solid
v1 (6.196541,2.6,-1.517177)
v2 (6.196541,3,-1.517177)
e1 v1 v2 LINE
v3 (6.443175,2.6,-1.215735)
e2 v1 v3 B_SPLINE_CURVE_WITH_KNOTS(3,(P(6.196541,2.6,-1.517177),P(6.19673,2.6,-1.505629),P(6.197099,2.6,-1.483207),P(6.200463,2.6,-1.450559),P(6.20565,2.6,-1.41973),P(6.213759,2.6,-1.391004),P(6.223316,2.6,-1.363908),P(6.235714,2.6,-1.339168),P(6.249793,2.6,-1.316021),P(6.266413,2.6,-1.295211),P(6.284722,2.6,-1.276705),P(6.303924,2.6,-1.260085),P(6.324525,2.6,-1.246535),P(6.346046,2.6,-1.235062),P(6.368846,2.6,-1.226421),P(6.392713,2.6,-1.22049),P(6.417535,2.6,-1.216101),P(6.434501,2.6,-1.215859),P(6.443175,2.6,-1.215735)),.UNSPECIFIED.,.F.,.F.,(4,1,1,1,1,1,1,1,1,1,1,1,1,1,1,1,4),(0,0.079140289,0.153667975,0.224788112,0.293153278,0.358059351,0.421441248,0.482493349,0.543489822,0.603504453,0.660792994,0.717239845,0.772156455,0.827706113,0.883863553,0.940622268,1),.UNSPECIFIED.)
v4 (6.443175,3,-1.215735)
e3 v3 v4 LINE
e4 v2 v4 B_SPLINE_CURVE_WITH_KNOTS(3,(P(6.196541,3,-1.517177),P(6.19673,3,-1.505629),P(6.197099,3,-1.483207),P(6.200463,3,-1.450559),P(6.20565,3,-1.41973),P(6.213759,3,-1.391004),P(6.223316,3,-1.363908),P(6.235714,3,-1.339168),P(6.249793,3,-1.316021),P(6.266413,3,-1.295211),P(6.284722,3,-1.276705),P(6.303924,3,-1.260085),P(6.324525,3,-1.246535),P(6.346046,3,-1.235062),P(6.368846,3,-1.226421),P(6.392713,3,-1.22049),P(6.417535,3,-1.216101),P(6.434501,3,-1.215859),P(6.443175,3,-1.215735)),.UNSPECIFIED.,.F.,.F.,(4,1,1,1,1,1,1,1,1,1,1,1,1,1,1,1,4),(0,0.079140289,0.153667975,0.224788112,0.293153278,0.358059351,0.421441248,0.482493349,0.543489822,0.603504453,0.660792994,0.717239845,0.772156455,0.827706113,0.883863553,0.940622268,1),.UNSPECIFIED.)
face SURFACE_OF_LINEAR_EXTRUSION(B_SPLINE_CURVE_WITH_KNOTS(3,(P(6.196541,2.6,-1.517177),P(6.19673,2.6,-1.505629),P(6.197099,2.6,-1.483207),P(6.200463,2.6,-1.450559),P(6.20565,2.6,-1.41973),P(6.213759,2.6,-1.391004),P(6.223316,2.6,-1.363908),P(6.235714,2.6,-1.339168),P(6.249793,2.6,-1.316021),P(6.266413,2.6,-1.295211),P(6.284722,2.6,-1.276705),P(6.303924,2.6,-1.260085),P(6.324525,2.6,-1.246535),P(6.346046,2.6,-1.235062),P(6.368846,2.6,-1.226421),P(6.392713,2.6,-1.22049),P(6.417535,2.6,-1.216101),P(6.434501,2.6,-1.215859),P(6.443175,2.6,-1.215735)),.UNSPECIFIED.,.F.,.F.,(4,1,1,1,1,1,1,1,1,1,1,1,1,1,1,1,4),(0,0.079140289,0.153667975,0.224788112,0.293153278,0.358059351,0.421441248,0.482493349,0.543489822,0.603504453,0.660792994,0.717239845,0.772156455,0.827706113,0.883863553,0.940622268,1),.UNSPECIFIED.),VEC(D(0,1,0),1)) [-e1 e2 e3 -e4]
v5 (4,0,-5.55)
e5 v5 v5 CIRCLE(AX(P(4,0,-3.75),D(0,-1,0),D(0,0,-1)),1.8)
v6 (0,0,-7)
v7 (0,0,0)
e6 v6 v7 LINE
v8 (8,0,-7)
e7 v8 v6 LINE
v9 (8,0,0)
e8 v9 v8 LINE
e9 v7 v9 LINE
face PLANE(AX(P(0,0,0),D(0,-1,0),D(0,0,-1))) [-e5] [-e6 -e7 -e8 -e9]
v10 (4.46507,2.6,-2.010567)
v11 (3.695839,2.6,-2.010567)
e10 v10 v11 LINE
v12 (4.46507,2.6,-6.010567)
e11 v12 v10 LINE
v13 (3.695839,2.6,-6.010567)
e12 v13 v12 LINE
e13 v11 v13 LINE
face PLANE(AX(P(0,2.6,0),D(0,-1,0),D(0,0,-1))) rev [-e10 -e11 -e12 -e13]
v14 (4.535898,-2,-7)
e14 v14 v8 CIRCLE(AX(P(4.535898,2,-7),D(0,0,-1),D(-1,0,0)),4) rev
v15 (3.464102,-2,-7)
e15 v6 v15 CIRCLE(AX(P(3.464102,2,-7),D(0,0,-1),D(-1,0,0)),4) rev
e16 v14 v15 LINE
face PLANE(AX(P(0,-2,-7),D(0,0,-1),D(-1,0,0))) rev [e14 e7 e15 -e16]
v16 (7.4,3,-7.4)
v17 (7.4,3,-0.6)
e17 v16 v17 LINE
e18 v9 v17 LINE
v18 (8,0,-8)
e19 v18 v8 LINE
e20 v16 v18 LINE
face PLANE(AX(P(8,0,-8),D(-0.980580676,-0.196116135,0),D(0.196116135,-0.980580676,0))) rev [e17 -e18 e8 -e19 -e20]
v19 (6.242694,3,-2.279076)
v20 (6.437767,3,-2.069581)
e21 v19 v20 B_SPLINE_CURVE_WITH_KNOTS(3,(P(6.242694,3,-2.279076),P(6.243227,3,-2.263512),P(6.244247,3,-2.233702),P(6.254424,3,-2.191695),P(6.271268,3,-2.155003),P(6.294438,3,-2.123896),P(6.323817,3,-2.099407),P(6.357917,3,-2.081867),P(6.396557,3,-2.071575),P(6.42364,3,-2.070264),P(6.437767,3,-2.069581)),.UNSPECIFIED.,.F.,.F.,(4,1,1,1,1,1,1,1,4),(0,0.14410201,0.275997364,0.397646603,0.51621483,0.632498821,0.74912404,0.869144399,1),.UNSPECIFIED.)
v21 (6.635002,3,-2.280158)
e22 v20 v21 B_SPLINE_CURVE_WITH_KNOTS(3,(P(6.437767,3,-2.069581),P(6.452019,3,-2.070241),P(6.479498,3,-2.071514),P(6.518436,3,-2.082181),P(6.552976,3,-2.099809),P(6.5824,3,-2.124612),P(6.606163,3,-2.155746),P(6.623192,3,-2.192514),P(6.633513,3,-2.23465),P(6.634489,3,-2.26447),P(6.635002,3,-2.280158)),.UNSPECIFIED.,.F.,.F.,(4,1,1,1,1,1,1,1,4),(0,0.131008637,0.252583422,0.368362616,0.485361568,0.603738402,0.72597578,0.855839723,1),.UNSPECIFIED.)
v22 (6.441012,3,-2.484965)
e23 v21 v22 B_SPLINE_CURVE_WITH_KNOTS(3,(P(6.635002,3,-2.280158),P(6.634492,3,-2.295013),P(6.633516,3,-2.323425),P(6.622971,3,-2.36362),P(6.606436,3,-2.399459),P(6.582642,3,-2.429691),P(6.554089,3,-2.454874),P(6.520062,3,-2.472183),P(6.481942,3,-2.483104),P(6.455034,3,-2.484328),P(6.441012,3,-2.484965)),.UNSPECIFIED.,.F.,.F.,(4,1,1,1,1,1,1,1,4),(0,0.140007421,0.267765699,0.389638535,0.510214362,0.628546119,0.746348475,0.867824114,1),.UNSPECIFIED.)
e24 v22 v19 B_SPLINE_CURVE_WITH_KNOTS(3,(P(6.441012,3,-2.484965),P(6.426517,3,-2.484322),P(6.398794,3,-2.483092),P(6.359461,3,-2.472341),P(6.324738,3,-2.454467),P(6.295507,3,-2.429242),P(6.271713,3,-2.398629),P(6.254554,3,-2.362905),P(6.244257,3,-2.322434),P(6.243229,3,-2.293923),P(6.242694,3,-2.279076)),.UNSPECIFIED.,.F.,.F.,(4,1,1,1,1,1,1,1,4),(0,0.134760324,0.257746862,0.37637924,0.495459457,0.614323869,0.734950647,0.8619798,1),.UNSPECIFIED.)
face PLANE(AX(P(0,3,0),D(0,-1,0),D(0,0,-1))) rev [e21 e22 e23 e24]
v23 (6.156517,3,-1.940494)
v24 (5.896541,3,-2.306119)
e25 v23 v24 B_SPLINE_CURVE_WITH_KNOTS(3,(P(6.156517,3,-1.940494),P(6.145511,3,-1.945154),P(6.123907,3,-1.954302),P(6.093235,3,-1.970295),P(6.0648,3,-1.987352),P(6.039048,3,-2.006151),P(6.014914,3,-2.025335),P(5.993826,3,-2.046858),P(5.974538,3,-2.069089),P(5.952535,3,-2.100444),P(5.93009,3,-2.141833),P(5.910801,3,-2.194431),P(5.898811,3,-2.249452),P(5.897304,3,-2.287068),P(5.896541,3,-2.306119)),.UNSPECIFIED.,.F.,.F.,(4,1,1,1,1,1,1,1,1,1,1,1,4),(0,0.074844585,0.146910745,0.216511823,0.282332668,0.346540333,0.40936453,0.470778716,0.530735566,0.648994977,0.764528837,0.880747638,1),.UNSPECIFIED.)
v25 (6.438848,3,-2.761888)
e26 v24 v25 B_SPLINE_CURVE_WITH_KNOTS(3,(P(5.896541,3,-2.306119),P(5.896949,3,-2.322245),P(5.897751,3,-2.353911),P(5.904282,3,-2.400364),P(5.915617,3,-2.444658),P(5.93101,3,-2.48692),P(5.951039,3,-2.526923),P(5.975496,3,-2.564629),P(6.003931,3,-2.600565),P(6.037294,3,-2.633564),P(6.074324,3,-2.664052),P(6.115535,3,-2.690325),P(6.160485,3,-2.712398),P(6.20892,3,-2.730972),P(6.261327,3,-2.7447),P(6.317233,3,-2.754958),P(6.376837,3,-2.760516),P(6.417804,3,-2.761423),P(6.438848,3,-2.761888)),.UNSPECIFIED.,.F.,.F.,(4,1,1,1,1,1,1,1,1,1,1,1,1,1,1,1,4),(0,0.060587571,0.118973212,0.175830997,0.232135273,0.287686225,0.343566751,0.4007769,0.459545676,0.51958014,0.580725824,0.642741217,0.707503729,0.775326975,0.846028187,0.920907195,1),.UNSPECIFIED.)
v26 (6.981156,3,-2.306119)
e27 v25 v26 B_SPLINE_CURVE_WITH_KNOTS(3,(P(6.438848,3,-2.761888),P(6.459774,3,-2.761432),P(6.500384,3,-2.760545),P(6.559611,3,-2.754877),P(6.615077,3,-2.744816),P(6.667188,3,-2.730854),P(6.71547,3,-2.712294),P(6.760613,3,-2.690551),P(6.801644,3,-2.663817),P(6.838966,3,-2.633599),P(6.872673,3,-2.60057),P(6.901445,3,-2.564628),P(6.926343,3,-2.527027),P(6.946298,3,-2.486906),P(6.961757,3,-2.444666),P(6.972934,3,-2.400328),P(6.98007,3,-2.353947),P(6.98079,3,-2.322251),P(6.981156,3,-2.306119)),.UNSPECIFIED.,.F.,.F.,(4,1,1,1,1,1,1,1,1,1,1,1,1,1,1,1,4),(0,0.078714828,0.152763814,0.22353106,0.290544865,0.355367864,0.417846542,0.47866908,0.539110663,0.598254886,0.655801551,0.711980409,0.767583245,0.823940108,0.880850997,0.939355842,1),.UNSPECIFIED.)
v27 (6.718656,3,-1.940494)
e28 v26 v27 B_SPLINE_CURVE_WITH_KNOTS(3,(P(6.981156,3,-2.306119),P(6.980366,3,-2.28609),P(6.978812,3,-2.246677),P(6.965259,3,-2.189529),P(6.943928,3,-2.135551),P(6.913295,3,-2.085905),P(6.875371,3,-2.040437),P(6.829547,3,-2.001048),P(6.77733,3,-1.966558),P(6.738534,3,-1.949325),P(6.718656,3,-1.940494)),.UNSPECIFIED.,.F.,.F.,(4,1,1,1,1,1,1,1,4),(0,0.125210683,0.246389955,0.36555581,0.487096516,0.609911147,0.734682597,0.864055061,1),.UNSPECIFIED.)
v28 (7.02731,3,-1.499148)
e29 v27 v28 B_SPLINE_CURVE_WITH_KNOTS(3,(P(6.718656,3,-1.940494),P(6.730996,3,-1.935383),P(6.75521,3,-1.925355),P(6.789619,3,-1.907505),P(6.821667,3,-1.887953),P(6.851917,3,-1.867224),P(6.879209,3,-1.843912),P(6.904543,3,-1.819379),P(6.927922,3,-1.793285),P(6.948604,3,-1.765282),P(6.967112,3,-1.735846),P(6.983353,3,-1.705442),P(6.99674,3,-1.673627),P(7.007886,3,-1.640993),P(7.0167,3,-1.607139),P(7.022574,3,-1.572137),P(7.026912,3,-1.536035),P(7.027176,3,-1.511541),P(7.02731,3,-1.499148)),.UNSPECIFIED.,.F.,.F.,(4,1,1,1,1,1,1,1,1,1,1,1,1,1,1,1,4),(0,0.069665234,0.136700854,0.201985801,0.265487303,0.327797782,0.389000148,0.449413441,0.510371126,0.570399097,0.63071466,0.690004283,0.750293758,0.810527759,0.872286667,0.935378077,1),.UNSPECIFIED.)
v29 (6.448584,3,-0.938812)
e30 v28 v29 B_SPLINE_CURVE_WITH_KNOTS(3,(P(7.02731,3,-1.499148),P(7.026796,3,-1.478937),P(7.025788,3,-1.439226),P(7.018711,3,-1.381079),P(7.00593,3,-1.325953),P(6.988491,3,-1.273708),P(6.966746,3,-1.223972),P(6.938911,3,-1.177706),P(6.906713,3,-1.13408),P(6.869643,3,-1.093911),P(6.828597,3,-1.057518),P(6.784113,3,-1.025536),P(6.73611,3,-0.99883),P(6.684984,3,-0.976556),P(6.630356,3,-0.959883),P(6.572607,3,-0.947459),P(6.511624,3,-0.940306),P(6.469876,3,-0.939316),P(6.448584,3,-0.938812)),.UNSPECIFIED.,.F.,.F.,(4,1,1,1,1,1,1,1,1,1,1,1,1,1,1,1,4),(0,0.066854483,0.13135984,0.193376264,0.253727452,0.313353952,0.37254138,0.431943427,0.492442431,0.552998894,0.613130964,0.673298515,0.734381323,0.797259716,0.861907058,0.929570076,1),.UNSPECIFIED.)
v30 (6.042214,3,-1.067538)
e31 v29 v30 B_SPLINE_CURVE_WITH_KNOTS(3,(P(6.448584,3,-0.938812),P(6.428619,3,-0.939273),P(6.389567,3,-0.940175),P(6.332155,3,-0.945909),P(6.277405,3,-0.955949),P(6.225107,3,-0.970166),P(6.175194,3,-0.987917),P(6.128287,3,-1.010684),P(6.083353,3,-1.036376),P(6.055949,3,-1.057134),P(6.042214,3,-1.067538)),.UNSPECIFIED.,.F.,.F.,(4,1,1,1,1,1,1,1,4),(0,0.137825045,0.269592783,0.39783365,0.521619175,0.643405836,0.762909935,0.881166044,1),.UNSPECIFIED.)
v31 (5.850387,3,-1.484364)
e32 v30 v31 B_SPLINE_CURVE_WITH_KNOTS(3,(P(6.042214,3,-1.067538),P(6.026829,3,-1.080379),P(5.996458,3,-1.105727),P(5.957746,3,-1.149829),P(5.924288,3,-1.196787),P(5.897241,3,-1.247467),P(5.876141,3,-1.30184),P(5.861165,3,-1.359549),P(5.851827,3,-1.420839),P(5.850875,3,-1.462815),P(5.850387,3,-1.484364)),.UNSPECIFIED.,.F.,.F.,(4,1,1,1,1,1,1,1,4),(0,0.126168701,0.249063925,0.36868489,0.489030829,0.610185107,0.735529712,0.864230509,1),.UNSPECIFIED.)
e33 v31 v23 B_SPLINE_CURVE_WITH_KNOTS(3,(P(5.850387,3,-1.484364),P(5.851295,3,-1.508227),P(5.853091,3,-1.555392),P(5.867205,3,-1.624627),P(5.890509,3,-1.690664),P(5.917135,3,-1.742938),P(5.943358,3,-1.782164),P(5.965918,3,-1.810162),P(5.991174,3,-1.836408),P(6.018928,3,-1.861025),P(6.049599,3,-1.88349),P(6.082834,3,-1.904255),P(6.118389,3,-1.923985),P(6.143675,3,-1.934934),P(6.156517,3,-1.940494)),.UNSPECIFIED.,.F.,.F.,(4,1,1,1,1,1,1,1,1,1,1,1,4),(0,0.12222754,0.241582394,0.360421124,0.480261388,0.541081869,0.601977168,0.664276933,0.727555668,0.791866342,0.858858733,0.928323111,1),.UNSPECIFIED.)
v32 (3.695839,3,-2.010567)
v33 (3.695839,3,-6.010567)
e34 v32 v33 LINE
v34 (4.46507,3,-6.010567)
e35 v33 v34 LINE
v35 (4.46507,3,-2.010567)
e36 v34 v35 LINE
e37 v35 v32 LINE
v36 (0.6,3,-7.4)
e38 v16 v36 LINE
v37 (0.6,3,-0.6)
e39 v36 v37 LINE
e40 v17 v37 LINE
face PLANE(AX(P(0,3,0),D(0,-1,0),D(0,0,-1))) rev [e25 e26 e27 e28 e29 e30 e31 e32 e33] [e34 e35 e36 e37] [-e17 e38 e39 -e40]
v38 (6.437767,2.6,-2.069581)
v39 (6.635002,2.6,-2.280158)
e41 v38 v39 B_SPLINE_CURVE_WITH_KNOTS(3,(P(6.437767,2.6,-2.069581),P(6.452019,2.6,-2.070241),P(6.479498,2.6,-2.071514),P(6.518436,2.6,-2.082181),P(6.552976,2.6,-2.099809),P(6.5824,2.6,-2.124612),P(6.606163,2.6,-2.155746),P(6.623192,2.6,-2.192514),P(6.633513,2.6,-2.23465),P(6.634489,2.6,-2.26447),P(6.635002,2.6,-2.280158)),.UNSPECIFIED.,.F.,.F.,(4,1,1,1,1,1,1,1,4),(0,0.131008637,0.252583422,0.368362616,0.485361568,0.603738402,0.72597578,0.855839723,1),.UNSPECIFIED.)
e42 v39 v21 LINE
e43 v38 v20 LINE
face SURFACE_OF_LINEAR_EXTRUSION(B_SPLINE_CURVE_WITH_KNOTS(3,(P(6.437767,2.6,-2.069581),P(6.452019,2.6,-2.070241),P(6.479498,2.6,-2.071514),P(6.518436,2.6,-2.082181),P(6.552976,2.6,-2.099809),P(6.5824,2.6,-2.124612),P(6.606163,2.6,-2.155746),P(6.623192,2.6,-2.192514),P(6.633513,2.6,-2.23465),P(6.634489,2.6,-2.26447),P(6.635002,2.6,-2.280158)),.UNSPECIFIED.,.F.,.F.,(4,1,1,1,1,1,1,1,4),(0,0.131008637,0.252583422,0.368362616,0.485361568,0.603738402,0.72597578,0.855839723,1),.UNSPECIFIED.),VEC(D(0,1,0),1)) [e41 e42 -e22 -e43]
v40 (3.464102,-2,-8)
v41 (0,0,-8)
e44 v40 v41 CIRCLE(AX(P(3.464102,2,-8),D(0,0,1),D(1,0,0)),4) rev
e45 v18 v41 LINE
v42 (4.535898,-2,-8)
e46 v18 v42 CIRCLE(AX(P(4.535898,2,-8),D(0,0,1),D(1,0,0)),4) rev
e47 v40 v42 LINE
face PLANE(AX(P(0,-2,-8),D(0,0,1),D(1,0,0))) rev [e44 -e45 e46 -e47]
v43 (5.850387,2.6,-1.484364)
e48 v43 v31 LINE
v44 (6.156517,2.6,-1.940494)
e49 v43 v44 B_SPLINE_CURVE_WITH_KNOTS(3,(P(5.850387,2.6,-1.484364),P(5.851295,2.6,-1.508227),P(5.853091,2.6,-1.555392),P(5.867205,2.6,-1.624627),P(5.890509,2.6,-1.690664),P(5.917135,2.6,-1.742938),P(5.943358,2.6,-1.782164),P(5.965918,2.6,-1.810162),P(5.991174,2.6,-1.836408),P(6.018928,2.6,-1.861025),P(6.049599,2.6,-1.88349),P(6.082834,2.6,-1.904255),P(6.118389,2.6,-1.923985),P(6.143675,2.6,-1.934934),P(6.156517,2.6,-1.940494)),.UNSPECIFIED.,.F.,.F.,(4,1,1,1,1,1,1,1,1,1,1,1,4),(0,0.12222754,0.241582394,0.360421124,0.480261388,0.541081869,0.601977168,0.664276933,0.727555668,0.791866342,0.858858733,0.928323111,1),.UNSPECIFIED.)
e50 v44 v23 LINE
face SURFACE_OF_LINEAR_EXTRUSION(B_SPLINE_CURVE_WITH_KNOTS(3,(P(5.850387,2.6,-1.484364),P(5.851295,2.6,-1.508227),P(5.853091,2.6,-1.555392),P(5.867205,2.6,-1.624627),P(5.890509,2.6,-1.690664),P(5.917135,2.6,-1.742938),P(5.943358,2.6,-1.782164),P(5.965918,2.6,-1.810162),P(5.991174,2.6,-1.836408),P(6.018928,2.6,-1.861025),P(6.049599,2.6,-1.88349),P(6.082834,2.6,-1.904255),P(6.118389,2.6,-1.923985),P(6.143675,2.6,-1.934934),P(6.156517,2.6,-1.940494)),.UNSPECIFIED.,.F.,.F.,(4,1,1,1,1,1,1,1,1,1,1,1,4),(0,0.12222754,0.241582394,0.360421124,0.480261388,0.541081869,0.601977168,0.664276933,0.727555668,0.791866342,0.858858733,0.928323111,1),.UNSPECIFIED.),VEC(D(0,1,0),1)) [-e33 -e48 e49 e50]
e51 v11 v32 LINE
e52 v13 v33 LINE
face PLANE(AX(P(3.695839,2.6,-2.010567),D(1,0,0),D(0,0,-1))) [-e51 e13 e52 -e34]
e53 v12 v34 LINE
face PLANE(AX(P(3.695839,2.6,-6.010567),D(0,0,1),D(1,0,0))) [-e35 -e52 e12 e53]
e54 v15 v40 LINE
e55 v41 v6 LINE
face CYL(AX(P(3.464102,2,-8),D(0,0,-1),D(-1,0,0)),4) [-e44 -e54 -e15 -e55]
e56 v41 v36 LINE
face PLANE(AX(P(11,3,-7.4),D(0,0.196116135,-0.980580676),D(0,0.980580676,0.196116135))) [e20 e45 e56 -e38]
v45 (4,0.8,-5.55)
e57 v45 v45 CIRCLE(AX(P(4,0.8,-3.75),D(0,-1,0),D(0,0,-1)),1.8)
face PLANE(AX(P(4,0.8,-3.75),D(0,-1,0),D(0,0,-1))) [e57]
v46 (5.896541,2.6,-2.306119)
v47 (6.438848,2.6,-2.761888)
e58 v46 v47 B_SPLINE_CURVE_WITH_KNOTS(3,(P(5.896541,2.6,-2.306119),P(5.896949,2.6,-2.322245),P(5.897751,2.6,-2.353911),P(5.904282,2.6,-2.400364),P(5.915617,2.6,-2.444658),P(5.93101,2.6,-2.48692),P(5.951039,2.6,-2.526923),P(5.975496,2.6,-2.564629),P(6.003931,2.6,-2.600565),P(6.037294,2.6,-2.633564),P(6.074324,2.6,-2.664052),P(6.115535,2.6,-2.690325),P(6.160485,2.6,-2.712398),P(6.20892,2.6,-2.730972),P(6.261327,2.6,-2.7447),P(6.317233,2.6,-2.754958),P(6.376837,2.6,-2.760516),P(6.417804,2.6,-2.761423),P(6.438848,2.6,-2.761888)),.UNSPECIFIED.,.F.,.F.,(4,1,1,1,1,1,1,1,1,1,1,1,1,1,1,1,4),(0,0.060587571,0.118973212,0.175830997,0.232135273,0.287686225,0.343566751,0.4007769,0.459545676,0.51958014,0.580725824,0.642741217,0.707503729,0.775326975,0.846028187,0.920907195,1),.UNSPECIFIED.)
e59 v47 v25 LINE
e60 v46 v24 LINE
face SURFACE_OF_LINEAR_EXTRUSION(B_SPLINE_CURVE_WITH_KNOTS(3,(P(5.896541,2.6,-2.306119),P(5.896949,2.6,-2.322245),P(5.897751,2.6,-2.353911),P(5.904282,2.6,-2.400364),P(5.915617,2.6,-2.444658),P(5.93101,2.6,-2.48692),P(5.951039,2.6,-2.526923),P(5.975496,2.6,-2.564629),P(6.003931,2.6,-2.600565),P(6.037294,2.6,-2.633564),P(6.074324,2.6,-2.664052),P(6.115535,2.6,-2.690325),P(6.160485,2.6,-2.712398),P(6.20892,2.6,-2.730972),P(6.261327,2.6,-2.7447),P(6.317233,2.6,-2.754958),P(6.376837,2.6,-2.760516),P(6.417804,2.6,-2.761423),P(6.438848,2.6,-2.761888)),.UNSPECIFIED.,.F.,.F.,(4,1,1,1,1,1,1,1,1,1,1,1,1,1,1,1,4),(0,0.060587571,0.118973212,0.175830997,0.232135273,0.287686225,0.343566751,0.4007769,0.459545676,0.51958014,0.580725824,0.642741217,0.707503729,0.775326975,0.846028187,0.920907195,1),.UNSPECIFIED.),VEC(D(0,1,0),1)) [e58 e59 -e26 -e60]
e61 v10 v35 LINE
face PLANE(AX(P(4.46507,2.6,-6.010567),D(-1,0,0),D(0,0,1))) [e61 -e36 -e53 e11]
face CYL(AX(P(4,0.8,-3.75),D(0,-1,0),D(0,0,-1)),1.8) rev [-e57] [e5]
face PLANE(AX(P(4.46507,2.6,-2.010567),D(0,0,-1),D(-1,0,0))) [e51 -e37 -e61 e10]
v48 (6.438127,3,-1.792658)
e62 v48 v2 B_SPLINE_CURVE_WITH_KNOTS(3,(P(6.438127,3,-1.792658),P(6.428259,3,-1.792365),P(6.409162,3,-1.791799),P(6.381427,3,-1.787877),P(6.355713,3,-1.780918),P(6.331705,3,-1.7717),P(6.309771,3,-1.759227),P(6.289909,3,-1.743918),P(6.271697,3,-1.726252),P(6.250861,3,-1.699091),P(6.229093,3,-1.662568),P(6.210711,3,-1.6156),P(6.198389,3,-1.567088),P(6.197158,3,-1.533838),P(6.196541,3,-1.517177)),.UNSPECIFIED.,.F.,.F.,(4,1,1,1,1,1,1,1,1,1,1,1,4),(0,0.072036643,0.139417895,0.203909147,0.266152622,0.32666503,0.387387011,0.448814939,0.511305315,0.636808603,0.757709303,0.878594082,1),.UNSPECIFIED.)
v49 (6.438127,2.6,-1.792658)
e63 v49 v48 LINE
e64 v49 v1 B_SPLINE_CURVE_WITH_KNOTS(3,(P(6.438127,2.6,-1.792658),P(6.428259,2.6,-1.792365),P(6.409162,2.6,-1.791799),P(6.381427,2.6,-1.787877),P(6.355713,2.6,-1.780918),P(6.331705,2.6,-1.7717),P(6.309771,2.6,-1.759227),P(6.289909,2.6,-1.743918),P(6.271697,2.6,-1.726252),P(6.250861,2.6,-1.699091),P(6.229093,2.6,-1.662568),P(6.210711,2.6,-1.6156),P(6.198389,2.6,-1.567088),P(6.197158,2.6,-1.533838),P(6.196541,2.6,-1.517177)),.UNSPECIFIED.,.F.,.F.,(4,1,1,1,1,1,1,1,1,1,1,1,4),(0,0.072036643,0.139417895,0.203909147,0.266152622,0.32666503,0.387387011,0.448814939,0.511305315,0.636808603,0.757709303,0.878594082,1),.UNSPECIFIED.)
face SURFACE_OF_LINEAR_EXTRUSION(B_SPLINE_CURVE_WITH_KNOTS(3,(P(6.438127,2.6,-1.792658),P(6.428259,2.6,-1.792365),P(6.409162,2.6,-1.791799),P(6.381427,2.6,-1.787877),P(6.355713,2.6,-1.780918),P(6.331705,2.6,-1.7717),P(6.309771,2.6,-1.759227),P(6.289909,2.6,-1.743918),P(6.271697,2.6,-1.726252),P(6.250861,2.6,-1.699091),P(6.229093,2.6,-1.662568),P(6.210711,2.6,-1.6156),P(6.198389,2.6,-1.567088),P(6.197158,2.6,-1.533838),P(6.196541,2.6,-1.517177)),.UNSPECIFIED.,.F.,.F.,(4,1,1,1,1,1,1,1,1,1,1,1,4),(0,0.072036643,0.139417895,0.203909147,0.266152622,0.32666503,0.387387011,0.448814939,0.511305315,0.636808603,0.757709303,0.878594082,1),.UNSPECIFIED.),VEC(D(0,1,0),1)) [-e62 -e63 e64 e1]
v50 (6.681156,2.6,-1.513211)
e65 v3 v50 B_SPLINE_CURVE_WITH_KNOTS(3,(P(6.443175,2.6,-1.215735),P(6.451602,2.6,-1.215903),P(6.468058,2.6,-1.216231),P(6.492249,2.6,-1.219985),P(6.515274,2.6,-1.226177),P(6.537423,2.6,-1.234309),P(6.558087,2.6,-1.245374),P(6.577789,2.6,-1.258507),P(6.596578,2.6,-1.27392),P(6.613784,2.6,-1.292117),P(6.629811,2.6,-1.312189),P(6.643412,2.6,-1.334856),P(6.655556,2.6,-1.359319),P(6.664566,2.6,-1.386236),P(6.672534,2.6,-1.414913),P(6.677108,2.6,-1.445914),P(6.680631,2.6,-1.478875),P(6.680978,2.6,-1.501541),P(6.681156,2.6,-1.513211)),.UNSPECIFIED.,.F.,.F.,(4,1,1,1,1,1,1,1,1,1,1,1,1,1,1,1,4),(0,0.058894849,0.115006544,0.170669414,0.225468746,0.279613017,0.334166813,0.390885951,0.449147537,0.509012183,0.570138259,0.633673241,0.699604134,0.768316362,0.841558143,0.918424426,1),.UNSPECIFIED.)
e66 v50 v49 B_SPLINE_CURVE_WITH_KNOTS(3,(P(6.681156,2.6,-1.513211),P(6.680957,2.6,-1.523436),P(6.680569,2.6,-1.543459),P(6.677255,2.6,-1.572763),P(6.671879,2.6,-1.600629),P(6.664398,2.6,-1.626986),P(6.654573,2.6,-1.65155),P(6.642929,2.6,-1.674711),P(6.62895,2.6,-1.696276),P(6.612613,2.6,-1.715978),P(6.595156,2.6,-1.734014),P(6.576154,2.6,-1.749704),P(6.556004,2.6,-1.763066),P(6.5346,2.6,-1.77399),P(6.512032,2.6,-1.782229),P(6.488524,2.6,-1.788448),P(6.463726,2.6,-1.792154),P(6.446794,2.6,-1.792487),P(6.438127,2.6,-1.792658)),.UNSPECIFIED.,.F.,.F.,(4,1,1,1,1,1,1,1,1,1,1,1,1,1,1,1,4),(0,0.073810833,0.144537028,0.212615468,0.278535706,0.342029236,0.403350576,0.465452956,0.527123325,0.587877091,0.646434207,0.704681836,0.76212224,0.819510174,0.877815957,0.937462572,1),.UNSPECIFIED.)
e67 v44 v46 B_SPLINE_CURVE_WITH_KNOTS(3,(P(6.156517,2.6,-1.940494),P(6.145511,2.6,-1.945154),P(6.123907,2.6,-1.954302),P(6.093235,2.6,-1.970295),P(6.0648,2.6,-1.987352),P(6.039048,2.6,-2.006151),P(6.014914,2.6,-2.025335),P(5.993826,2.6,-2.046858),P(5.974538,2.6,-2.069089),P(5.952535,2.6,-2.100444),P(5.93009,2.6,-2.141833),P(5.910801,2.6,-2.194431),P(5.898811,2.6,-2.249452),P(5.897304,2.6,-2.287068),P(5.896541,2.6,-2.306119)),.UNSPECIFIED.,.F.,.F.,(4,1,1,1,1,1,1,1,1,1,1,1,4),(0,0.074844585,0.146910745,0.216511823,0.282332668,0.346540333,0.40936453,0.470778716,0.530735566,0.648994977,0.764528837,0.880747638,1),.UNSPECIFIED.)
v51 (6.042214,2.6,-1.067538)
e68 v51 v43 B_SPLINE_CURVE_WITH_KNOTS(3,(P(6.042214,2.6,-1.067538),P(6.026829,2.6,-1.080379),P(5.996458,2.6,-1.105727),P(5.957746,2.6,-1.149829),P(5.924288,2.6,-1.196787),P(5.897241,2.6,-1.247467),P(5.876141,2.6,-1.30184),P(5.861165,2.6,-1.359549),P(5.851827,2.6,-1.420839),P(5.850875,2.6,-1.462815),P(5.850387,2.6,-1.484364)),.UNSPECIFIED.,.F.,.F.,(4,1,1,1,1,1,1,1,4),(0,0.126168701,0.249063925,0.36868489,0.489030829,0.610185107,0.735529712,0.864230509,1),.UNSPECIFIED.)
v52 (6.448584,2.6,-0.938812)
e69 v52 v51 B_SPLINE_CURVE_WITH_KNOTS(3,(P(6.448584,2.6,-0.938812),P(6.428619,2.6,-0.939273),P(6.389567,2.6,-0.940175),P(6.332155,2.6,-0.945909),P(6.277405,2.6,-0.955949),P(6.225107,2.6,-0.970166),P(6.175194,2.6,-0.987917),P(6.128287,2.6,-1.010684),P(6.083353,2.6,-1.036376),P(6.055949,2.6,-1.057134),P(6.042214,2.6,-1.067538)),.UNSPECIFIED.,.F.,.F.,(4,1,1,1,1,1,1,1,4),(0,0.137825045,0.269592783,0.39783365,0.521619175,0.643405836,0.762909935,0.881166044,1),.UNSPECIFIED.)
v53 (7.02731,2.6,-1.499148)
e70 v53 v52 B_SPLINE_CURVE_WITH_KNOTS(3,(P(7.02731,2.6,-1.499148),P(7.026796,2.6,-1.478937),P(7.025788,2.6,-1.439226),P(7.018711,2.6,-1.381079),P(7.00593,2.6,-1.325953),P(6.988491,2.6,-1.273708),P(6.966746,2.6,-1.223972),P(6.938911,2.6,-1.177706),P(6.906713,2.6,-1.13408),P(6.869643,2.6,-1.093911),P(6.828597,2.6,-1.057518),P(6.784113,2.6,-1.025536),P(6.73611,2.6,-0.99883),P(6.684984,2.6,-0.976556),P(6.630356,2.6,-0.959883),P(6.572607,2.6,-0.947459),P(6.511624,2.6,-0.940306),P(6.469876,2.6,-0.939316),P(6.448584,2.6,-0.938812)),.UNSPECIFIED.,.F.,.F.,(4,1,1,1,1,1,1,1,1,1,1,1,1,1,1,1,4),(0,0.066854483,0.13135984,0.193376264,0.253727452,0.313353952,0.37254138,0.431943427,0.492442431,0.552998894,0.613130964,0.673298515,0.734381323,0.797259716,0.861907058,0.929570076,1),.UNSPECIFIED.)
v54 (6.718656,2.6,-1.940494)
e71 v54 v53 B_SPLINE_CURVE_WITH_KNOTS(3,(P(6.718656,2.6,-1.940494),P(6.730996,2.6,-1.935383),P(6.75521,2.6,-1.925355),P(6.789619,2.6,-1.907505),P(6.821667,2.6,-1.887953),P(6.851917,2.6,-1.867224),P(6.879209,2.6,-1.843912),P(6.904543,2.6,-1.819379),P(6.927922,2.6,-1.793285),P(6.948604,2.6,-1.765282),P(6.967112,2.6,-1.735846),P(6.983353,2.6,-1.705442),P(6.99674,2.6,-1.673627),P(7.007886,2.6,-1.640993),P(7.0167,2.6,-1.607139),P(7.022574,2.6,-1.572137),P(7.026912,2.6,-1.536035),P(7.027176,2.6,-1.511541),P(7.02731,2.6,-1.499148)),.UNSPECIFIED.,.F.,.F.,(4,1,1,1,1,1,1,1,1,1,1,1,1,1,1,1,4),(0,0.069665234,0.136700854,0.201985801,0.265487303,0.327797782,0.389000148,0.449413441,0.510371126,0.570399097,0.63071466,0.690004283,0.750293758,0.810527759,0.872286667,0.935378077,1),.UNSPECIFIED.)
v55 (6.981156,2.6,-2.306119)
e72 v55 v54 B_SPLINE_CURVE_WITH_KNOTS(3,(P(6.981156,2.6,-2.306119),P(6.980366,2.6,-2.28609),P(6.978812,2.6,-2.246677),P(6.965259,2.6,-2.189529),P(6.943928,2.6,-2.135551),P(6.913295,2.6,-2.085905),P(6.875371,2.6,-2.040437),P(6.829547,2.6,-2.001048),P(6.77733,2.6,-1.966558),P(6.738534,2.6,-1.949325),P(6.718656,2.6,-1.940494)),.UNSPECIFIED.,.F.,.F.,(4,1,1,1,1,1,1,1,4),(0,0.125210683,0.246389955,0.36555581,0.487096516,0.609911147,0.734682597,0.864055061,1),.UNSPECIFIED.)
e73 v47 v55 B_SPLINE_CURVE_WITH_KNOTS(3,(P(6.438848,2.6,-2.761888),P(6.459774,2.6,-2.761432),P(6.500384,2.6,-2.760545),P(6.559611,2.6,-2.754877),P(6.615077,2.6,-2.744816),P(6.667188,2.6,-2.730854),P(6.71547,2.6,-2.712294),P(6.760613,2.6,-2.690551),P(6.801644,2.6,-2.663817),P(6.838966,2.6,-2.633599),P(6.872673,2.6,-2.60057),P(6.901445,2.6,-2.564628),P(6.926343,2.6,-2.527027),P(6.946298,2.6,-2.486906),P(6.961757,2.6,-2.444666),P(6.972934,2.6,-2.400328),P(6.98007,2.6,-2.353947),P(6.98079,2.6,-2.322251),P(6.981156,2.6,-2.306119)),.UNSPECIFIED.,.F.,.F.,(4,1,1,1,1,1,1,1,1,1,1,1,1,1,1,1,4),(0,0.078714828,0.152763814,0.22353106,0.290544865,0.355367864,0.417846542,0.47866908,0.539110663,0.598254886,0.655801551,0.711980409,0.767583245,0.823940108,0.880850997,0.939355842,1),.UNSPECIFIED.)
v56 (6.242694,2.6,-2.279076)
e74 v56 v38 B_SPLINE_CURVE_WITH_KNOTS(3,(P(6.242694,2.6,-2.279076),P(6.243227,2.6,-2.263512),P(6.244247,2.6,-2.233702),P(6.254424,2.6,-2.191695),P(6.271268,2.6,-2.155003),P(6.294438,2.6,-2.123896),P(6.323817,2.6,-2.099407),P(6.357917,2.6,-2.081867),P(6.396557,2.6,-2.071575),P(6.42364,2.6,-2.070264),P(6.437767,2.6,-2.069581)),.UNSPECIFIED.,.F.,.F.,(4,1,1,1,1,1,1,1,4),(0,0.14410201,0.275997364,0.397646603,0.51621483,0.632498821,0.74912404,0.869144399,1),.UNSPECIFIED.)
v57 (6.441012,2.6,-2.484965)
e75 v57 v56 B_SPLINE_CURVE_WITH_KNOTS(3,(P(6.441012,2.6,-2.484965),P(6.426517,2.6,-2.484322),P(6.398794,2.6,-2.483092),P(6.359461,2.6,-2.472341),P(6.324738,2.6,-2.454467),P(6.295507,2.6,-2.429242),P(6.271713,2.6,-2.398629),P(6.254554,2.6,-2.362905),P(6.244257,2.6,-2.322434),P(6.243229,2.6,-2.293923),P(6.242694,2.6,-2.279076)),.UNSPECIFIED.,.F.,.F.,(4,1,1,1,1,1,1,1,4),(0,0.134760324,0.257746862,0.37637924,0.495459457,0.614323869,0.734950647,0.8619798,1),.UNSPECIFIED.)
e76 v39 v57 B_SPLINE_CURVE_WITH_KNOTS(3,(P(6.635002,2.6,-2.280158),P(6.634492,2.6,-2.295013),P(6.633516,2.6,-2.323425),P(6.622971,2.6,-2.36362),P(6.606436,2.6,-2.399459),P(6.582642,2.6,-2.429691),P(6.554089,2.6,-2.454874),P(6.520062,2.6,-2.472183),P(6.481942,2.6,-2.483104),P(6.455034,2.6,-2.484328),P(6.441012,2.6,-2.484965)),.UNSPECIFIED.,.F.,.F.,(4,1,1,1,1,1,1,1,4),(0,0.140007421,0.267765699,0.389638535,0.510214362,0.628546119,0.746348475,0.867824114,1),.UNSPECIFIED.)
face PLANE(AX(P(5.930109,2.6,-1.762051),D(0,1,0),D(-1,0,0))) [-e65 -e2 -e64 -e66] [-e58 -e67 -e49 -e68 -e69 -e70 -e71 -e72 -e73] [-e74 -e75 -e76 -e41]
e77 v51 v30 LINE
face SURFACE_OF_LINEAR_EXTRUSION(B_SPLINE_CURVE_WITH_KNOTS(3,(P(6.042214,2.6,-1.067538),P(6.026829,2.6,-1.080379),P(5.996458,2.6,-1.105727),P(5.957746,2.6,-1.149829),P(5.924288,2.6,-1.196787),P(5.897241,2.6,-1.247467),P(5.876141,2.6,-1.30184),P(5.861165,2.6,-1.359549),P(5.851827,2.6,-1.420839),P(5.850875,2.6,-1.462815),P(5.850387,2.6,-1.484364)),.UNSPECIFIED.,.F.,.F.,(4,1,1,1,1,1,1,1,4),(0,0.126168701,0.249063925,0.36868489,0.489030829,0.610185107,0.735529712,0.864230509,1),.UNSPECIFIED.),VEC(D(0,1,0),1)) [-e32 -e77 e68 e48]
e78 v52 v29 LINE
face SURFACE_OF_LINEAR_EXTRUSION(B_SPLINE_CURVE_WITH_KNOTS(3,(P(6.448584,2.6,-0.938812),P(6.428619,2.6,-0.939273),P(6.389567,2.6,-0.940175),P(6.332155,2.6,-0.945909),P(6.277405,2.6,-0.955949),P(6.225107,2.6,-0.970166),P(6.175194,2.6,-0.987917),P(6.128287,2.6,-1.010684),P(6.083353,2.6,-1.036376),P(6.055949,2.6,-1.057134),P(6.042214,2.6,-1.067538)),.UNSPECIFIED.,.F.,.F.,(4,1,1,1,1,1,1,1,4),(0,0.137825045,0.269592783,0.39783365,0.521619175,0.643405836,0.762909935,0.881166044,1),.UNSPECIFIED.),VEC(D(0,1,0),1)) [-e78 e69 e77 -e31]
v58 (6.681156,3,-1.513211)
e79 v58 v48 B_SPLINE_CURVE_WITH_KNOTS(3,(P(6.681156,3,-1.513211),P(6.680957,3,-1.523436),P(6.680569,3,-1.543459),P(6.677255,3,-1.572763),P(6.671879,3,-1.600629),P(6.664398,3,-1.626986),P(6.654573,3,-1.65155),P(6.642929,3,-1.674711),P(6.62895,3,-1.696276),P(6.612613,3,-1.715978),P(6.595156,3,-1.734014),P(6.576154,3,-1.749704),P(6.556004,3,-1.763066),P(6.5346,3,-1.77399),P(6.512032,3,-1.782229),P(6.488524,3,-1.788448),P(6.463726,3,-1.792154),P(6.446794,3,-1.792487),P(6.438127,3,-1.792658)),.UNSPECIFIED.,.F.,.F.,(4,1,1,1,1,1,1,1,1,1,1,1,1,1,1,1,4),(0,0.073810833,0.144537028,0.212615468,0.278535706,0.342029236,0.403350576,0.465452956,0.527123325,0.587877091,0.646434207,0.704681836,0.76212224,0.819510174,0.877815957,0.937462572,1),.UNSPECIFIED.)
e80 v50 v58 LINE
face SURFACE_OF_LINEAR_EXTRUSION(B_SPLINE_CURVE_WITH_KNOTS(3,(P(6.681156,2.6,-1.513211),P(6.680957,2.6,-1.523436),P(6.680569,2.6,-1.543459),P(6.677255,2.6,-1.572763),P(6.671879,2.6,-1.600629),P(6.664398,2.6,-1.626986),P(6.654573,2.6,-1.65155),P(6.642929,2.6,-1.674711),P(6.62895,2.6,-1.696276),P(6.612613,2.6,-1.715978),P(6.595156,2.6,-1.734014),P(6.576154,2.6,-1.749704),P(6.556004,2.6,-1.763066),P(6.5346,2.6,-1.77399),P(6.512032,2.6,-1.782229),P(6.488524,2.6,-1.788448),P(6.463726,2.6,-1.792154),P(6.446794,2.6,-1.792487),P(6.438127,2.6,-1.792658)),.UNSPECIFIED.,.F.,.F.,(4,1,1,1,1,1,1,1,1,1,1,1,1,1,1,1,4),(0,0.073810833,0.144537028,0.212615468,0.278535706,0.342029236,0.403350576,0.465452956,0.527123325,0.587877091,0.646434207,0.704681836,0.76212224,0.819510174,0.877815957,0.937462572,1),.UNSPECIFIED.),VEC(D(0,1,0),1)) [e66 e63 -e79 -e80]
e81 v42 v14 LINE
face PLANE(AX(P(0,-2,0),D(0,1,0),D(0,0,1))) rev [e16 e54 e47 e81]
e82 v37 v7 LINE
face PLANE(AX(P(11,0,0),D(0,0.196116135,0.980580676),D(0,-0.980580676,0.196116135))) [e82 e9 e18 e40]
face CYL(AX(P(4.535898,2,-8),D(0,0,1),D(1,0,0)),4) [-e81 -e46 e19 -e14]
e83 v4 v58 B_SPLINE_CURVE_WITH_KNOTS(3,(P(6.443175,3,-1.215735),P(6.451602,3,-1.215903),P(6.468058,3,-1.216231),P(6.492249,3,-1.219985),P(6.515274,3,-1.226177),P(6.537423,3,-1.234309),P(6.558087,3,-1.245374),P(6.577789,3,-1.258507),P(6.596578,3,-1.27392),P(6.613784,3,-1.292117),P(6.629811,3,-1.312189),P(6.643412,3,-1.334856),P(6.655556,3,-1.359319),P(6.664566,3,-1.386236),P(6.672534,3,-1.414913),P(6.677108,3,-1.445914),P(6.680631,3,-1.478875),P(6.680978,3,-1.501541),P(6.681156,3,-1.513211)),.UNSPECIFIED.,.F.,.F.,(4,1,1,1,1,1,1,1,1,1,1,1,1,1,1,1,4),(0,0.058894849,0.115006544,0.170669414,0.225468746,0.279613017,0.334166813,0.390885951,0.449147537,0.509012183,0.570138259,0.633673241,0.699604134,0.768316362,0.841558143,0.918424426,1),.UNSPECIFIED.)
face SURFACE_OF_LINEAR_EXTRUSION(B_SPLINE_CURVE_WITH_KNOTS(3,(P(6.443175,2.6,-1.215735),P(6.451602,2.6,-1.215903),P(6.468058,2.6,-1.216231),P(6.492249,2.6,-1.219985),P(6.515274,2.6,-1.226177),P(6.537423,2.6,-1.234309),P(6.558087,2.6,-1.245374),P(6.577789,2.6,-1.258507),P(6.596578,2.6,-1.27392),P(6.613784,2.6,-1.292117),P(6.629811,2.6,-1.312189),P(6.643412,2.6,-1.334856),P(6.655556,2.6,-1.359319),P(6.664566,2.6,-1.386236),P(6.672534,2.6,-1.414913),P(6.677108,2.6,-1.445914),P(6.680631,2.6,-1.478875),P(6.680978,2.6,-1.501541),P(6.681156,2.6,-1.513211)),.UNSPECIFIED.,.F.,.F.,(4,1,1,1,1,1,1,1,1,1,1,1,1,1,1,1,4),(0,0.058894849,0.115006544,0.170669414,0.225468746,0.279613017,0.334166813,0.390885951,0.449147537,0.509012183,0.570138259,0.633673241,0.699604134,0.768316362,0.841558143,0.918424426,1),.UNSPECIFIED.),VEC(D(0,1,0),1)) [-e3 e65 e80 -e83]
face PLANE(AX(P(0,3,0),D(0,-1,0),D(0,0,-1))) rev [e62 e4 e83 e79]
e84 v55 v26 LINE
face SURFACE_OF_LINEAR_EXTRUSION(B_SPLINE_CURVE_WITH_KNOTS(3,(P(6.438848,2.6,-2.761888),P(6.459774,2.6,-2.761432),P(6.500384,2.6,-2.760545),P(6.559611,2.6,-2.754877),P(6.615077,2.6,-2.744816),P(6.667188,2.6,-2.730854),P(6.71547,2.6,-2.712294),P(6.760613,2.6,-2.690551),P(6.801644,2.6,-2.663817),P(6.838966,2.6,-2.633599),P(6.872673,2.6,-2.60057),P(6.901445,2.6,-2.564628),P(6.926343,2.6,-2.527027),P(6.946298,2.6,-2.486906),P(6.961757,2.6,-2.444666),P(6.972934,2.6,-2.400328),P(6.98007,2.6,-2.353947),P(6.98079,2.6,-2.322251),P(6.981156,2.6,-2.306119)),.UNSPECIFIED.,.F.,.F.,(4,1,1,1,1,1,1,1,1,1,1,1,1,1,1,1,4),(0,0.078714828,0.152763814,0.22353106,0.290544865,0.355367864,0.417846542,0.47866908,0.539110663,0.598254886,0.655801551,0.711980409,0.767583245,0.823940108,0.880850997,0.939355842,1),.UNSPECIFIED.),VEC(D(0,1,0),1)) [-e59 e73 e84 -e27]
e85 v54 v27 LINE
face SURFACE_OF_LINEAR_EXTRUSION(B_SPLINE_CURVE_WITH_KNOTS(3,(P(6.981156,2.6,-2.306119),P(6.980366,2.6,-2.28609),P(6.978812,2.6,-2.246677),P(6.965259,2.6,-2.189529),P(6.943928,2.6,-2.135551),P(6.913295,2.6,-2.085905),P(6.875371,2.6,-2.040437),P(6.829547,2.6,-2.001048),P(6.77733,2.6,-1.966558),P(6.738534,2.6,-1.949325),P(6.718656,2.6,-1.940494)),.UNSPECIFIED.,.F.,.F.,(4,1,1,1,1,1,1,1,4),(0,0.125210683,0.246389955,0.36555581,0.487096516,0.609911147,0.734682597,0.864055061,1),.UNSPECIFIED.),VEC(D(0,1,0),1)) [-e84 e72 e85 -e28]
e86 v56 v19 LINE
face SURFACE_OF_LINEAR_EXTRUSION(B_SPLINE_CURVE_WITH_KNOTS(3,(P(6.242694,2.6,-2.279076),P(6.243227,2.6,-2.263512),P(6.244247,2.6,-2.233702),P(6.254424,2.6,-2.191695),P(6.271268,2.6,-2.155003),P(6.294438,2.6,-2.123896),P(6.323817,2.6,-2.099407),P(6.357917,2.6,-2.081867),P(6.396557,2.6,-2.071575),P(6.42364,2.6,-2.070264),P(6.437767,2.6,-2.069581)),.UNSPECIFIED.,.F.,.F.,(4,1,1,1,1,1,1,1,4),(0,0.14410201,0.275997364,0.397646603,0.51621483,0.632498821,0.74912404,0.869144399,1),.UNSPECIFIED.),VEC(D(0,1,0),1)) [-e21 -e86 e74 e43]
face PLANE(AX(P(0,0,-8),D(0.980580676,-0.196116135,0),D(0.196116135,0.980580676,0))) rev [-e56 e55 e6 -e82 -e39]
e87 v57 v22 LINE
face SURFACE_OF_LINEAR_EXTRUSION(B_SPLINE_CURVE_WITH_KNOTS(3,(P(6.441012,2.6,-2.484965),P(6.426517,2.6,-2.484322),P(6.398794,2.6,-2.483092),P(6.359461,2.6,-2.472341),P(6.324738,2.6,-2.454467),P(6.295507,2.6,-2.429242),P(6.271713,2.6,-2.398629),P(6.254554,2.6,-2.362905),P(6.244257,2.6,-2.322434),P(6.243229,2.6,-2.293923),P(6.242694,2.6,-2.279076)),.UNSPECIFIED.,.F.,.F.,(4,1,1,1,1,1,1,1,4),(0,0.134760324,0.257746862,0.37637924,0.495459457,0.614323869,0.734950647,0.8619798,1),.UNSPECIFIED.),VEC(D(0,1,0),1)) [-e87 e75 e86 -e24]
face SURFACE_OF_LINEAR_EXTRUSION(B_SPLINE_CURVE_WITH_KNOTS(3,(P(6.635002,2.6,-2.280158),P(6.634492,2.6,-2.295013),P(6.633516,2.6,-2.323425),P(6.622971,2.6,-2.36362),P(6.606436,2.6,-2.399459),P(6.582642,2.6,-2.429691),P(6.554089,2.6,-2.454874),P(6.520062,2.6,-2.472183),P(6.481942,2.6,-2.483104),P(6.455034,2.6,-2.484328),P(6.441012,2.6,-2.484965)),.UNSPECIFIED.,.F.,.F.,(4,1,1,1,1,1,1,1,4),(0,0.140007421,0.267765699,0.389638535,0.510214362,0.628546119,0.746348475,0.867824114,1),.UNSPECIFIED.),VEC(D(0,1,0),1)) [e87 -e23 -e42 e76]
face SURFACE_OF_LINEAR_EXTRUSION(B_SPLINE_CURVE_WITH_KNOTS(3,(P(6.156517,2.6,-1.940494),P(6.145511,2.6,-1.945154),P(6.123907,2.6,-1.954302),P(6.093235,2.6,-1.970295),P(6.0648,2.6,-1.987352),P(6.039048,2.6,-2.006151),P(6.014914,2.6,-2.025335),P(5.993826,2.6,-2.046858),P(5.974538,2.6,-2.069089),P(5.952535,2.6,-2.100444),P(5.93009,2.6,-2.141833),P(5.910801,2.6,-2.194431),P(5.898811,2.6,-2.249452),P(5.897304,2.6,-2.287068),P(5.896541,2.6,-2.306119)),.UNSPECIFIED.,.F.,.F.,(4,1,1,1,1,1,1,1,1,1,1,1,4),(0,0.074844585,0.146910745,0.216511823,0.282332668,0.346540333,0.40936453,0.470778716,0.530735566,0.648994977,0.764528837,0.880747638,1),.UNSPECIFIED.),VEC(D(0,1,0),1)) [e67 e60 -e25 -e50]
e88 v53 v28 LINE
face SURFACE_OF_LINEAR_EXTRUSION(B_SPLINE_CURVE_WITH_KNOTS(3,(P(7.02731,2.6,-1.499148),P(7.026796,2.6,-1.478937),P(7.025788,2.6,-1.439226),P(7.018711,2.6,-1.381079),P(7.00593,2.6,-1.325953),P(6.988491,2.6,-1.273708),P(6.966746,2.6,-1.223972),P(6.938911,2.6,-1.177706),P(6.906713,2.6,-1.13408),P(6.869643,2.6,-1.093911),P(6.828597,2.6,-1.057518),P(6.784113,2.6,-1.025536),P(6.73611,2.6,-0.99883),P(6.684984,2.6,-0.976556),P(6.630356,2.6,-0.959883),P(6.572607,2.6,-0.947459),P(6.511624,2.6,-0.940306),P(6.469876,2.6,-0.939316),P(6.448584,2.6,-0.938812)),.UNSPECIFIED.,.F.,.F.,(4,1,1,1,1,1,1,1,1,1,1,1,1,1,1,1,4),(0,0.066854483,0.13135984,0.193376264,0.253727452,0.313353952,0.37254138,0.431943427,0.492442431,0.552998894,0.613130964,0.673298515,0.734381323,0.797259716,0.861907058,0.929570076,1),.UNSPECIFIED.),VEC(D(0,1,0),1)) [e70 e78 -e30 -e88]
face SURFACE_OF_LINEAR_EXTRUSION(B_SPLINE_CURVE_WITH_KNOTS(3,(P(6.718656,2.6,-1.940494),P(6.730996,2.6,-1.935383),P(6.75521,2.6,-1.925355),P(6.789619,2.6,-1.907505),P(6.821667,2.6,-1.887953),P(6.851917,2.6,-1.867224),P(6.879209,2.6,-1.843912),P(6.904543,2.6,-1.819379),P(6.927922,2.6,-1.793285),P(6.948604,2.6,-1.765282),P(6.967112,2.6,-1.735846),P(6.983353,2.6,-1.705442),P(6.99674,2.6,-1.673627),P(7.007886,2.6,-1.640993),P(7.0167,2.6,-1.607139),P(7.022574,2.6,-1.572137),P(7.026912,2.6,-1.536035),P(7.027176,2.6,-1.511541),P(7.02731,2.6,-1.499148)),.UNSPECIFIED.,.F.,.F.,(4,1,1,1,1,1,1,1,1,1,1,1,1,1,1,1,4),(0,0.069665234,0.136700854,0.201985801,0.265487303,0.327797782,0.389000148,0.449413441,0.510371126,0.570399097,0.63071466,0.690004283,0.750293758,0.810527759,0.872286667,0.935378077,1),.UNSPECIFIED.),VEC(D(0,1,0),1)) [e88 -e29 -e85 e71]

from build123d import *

# Parameters (mm, degrees)
SKETCH1_W               = 8
SKETCH1_H               = 8
BOSS_EXTRUDE1_DEPTH     = 3
CUT_EXTRUDE1_DEPTH      = 12.704699911
CUT_EXTRUDE1_DEPTH_BACK = 12.704699911
CUT_EXTRUDE2_DEPTH      = 11
SKETCH4_R               = 1.8
CUT_EXTRUDE3_DEPTH      = 0.8
SKETCH5_W               = 8
SKETCH5_H               = 1
BOSS_EXTRUDE2_DEPTH     = 2
FILLET1_R               = 4
SKETCH6_W               = 0.769230769
SKETCH6_H               = 4
CUT_EXTRUDE4_DEPTH      = 0.4
CUT_EXTRUDE5_DEPTH      = 0.4


with BuildPart() as part:
    # Sketch1 → Boss-Extrude1 (new body)
    with BuildSketch(Plane(origin=(0, 0, 0), x_dir=(1, 0, 0), z_dir=(0, 1, 0))):
        with Locations((4, 4)):
            Rectangle(SKETCH1_W, SKETCH1_H)
    extrude(amount=BOSS_EXTRUDE1_DEPTH)

    # Sketch2 → Cut-Extrude1 (cut, two sides: drawn at the far end of the back side and taken through both)
    with BuildSketch(Plane.XY.offset(-CUT_EXTRUDE1_DEPTH_BACK)):
        Polygon((0, 0), (0.6, 3), (0, 3), align=None)
        Polygon((8, 0), (7.4, 3), (8, 3), align=None)
    extrude(amount=CUT_EXTRUDE1_DEPTH + CUT_EXTRUDE1_DEPTH_BACK, mode=Mode.SUBTRACT)

    # Sketch3 → Cut-Extrude2 (cut)
    with BuildSketch(Plane(origin=(0, 0, 0), x_dir=(0, 0, -1), z_dir=(1, 0, 0))):
        Polygon((0, 0), (0.6, 3), (0, 3), align=None)
        Polygon((8, 3), (7.4, 3), (8, 0), align=None)
    extrude(amount=CUT_EXTRUDE2_DEPTH, mode=Mode.SUBTRACT)

    # Sketch4 → Cut-Extrude3 (cut)
    with BuildSketch(Plane.XZ):
        with Locations(Location((4, -3.75, 0), (0, 0, 270))):
            Circle(SKETCH4_R)
    extrude(amount=-CUT_EXTRUDE3_DEPTH, mode=Mode.SUBTRACT)

    # Sketch5 → Boss-Extrude2 (add)
    with BuildSketch(Plane.XZ):
        with Locations((4, -7.5)):
            Rectangle(SKETCH5_W, SKETCH5_H)
    extrude(amount=BOSS_EXTRUDE2_DEPTH)

    # Fillet1
    # the kernel refuses this fillet: 4 mm, written as the material it takes off along each edge
    with BuildSketch(Plane(origin=(8, -2, -16.660254038), x_dir=(0, 1, 0), z_dir=(0, 0, 1)), Plane(origin=(0, -2, 1.660254038), x_dir=(0, 1, 0), z_dir=(0, 0, -1))) as fillet1_piece_1:
        with BuildLine():
            CenterArc((4, 3.464101615), FILLET1_R, 180, 60)
            Line((0, 3.464101615), (-0.08, 3.464101615))
            Line((-0.08, 3.464101615), (-0.08, 0))
            Line((-0.08, 0), (0, -0.08))
            ThreePointArc((0, -0.08), (1, -0.08), (1.96, -0.069282032))
            Line((1.96, -0.069282032), (2, 0))
        make_face()
    extrude(amount=18.320508076, mode=Mode.SUBTRACT)

    # Sketch6 → Cut-Extrude4 (cut)
    with BuildSketch(Plane(origin=(0, 3, 0), x_dir=(1, 0, 0), z_dir=(0, 1, 0))):
        with Locations((4.080454652, 4.010567225)):
            Rectangle(SKETCH6_W, SKETCH6_H)
    extrude(amount=-CUT_EXTRUDE4_DEPTH, mode=Mode.SUBTRACT)

    # Sketch7 → Cut-Extrude5 (cut)
    with BuildSketch(Plane(origin=(0, 3, 0), x_dir=(1, 0, 0), z_dir=(0, 1, 0))):
        with BuildLine():
            add(Edge.make_bspline(
                [(6.15651658, 1.940494244), (6.145510655, 1.945154492), (6.123907371, 1.954301988), (6.09323484, 1.970294914), (6.064799566, 1.987351514), (6.03904827, 2.006151328), (6.014913928, 2.025334971), (5.993825771, 2.046858093), (5.974537605, 2.069089397), (5.952535222, 2.100444232), (5.930090229, 2.141832976), (5.910800925, 2.194430822), (5.898811147, 2.249451533), (5.897303934, 2.287068468), (5.896540619, 2.306119244)],
                knots=[0, 0, 0, 0, 0.898135024, 1.762928937, 2.598141881, 3.387992021, 4.158483993, 4.912374357, 5.649344587, 6.368826796, 7.78793972, 9.174346042, 10.568971657, 12, 12, 12, 12], degree=3))
            add(Edge.make_bspline(
                [(5.896540619, 2.306119244), (5.896949128, 2.322245314), (5.897751301, 2.353911386), (5.904281857, 2.400363734), (5.915616882, 2.44465812), (5.931010165, 2.486919818), (5.951038649, 2.526923073), (5.975496438, 2.56462901), (6.003930921, 2.600564872), (6.037294343, 2.633564085), (6.074323927, 2.664052327), (6.115534703, 2.69032529), (6.160485402, 2.712397947), (6.20891965, 2.730972479), (6.261326587, 2.744700346), (6.31723261, 2.754957515), (6.376837021, 2.760515608), (6.417804161, 2.761422579), (6.438848311, 2.761888475)],
                knots=[0, 0, 0, 0, 0.969401132, 1.903571386, 2.813295953, 3.714164367, 4.602979607, 5.497068024, 6.412430398, 7.352730811, 8.313282239, 9.291613189, 10.283859467, 11.320059661, 12.405231593, 13.536450991, 14.734515125, 16, 16, 16, 16], degree=3))
            add(Edge.make_bspline(
                [(6.438848311, 2.761888475), (6.459773562, 2.761431674), (6.500383715, 2.760545149), (6.55961144, 2.754877249), (6.615077261, 2.744816374), (6.667188187, 2.730854406), (6.715469625, 2.712293645), (6.760612767, 2.690551265), (6.801644432, 2.66381705), (6.838966437, 2.633598573), (6.872672652, 2.600569648), (6.901445211, 2.564628122), (6.926343213, 2.527027151), (6.946297666, 2.486906382), (6.961756812, 2.444666111), (6.972933798, 2.400328314), (6.980070192, 2.353946909), (6.98078976, 2.322251495), (6.981156004, 2.306119244)],
                knots=[0, 0, 0, 0, 1.259437241, 2.444221022, 3.576496957, 4.648717845, 5.68588583, 6.685544666, 7.658705287, 8.625770615, 9.572078176, 10.492824823, 11.391686538, 12.281331915, 13.183041723, 14.093615956, 15.029693465, 16, 16, 16, 16], degree=3))
            add(Edge.make_bspline(
                [(6.981156004, 2.306119244), (6.980366305, 2.286090338), (6.978812332, 2.246677396), (6.965258975, 2.189529308), (6.943928318, 2.135551364), (6.913295241, 2.085904697), (6.875370779, 2.040437046), (6.829547075, 2.001047886), (6.777330344, 1.966558185), (6.738534469, 1.949324529), (6.718656004, 1.940494244)],
                knots=[0, 0, 0, 0, 1.001685467, 1.971119642, 2.924446479, 3.896772127, 4.879289176, 5.877460772, 6.912440485, 8, 8, 8, 8], degree=3))
            add(Edge.make_bspline(
                [(6.718656004, 1.940494244), (6.730995791, 1.935383384), (6.755209584, 1.92535458), (6.789618906, 1.907504981), (6.821666519, 1.887953149), (6.85191654, 1.867223707), (6.879208616, 1.843911559), (6.904542812, 1.819378981), (6.927921941, 1.793284607), (6.948603911, 1.76528217), (6.967111811, 1.735846397), (6.983352513, 1.705442361), (6.996740217, 1.673626651), (7.007885734, 1.640992504), (7.016699849, 1.607138887), (7.022574215, 1.572136793), (7.026912363, 1.536034577), (7.0271763, 1.511541428), (7.02730985, 1.49914809)],
                knots=[0, 0, 0, 0, 1.114643742, 2.187213659, 3.231772812, 4.247796845, 5.244764516, 6.224002375, 7.19061506, 8.165938012, 9.126385546, 10.091434554, 11.040068535, 12.004700134, 12.968444139, 13.956586669, 14.966049226, 16, 16, 16, 16], degree=3))
            add(Edge.make_bspline(
                [(7.02730985, 1.49914809), (7.026796446, 1.478937492), (7.025787679, 1.439226454), (7.018711219, 1.38107925), (7.005929874, 1.325952641), (6.988491467, 1.273708162), (6.966746481, 1.223971877), (6.938910841, 1.177706145), (6.906713253, 1.134080082), (6.869643217, 1.093910629), (6.828597293, 1.057517999), (6.784112626, 1.025535606), (6.736110057, 0.99883009), (6.684984255, 0.976556488), (6.630355755, 0.95988295), (6.572607046, 0.947459175), (6.511624372, 0.940305747), (6.469876213, 0.939316226), (6.448583888, 0.938811552)],
                knots=[0, 0, 0, 0, 1.069671731, 2.10175744, 3.09402022, 4.059639235, 5.013663234, 5.960662081, 6.911094837, 7.879078902, 8.847982309, 9.810095429, 10.772776236, 11.750101161, 12.756155452, 13.790512928, 14.873121219, 16, 16, 16, 16], degree=3))
            add(Edge.make_bspline(
                [(6.448583888, 0.938811552), (6.428619193, 0.939272791), (6.389567235, 0.940174998), (6.332155248, 0.945908933), (6.277405474, 0.955949195), (6.225107083, 0.970165993), (6.175193963, 0.987917291), (6.128286945, 1.010684294), (6.083352924, 1.036376334), (6.055949035, 1.05713359), (6.042213696, 1.067537513)],
                knots=[0, 0, 0, 0, 1.102600357, 2.156742264, 3.182669202, 4.172953404, 5.147246686, 6.10327948, 7.049328352, 8, 8, 8, 8], degree=3))
            add(Edge.make_bspline(
                [(6.042213696, 1.067537513), (6.026828749, 1.080378521), (5.996458022, 1.105727373), (5.957746472, 1.14982945), (5.924287717, 1.196787263), (5.897240595, 1.247466884), (5.876140917, 1.301840234), (5.861164702, 1.359548786), (5.851827258, 1.420839433), (5.850875415, 1.46281546), (5.850386773, 1.484364436)],
                knots=[0, 0, 0, 0, 1.009349607, 1.992511403, 2.949479119, 3.912246635, 4.881480856, 5.884237694, 6.913844069, 8, 8, 8, 8], degree=3))
            add(Edge.make_bspline(
                [(5.850386773, 1.484364436), (5.851295235, 1.508227217), (5.853090808, 1.555391937), (5.867205324, 1.624626505), (5.890509398, 1.690664462), (5.91713497, 1.74293756), (5.943357572, 1.782163786), (5.96591762, 1.810161528), (5.991173615, 1.836408274), (6.018927817, 1.861025046), (6.049598606, 1.883490474), (6.082833606, 1.904254883), (6.118388609, 1.923985052), (6.143675127, 1.934933969), (6.15651658, 1.940494244)],
                knots=[0, 0, 0, 0, 1.466730477, 2.898988729, 4.325053486, 5.763136659, 6.492982434, 7.22372602, 7.971323195, 8.73066801, 9.502396106, 10.306304791, 11.139877329, 12, 12, 12, 12], degree=3))
        make_face()
        with BuildLine():
            add(Edge.make_bspline(
                [(6.242694465, 2.279075975), (6.243227056, 2.263511707), (6.244247122, 2.233701597), (6.254423757, 2.191695088), (6.271267591, 2.155002663), (6.294437582, 2.123896005), (6.323817487, 2.099406734), (6.357917342, 2.081867293), (6.396556715, 2.071574989), (6.423640052, 2.070264386), (6.43776658, 2.069580783)],
                knots=[0, 0, 0, 0, 1.15281608, 2.207978909, 3.181172827, 4.129718639, 5.059990565, 5.992992319, 6.953155196, 8, 8, 8, 8], degree=3))
            add(Edge.make_bspline(
                [(6.43776658, 2.069580783), (6.452019198, 2.070240913), (6.479498112, 2.071513639), (6.518435607, 2.08218095), (6.552976359, 2.099808827), (6.582400264, 2.12461233), (6.606163254, 2.155745627), (6.623191809, 2.192513664), (6.633513276, 2.234649719), (6.634488897, 2.264469788), (6.635002157, 2.280157706)],
                knots=[0, 0, 0, 0, 1.048069097, 2.020667378, 2.946900928, 3.882892544, 4.829907216, 5.807806237, 6.846717784, 8, 8, 8, 8], degree=3))
            add(Edge.make_bspline(
                [(6.635002157, 2.280157706), (6.634491926, 2.295013238), (6.633516102, 2.323424602), (6.622970742, 2.363619613), (6.606436408, 2.39945922), (6.582642474, 2.429691049), (6.554089388, 2.454874147), (6.520061906, 2.472182505), (6.481941896, 2.483104081), (6.455033522, 2.484327752), (6.441011773, 2.484965398)],
                knots=[0, 0, 0, 0, 1.120059371, 2.14212559, 3.117108277, 4.081714894, 5.028368956, 5.970787798, 6.942592912, 8, 8, 8, 8], degree=3))
            add(Edge.make_bspline(
                [(6.441011773, 2.484965398), (6.426516896, 2.484322219), (6.398793536, 2.483092056), (6.359460666, 2.472341434), (6.324738063, 2.454466675), (6.295507469, 2.429242148), (6.271712994, 2.39862944), (6.254554233, 2.362905047), (6.244256622, 2.322433946), (6.243229383, 2.293922732), (6.242694465, 2.279075975)],
                knots=[0, 0, 0, 0, 1.078082589, 2.061974896, 3.011033917, 3.963675658, 4.914590949, 5.879605178, 6.895838403, 8, 8, 8, 8], degree=3))
        make_face(mode=Mode.SUBTRACT)
        with BuildLine():
            add(Edge.make_bspline(
                [(6.196540619, 1.517176936), (6.196730477, 1.505629296), (6.197099128, 1.483207057), (6.20046304, 1.450559294), (6.205649554, 1.419730372), (6.21375861, 1.391003719), (6.223316031, 1.363907928), (6.235714339, 1.339167945), (6.249793304, 1.316020987), (6.266412851, 1.295211256), (6.28472227, 1.276705394), (6.303924475, 1.260084604), (6.324524838, 1.246535242), (6.346046028, 1.235062063), (6.368845981, 1.226421032), (6.392712607, 1.220489591), (6.41753513, 1.216100982), (6.434500999, 1.215858569), (6.443175234, 1.215734629)],
                knots=[0, 0, 0, 0, 1.266244622, 2.458687606, 3.596609786, 4.690452447, 5.728949622, 6.743059962, 7.719893583, 8.695837149, 9.65607124, 10.572687906, 11.475837526, 12.354503287, 13.243297811, 14.141816854, 15.049956288, 16, 16, 16, 16], degree=3))
            add(Edge.make_bspline(
                [(6.443175234, 1.215734629), (6.451602181, 1.215902824), (6.468057847, 1.216231266), (6.492249091, 1.219984617), (6.515274313, 1.226176747), (6.537422773, 1.234309167), (6.558086812, 1.245374324), (6.577789165, 1.258506963), (6.596578489, 1.273920235), (6.613783635, 1.292116571), (6.62981085, 1.312188806), (6.643411897, 1.33485558), (6.65555564, 1.35931889), (6.66456557, 1.386236104), (6.67253431, 1.414913473), (6.677108469, 1.44591441), (6.680631417, 1.478875262), (6.68097771, 1.501540921), (6.681156004, 1.51321059)],
                knots=[0, 0, 0, 0, 0.942317584, 1.840104704, 2.730710625, 3.607499931, 4.473808274, 5.346669015, 6.254175223, 7.186360584, 8.144194921, 9.122212144, 10.13877185, 11.193666142, 12.293061794, 13.46493029, 14.694790812, 16, 16, 16, 16], degree=3))
            add(Edge.make_bspline(
                [(6.681156004, 1.51321059), (6.680957439, 1.523435783), (6.680568608, 1.543458845), (6.677255041, 1.572763282), (6.671879045, 1.600628764), (6.664397898, 1.626985973), (6.654573048, 1.6515499), (6.642928518, 1.674710577), (6.628949814, 1.696276432), (6.612613113, 1.715977787), (6.595156277, 1.734014144), (6.576153606, 1.749704056), (6.556004184, 1.763065709), (6.534599532, 1.773990125), (6.512031704, 1.782228962), (6.488523892, 1.78844843), (6.463726194, 1.792153595), (6.446793708, 1.792487039), (6.438127157, 1.792657706)],
                knots=[0, 0, 0, 0, 1.18097333, 2.312592441, 3.401847494, 4.45657129, 5.472467779, 6.453609222, 7.447247299, 8.433973197, 9.406033457, 10.342947316, 11.274909381, 12.193955836, 13.112162788, 14.045055317, 14.999401151, 16, 16, 16, 16], degree=3))
            add(Edge.make_bspline(
                [(6.438127157, 1.792657706), (6.428259379, 1.792365239), (6.40916153, 1.791799208), (6.381426866, 1.787876586), (6.355713318, 1.780917675), (6.331705458, 1.771700183), (6.309770612, 1.759227348), (6.289908926, 1.74391846), (6.271697391, 1.726251639), (6.250860821, 1.699090969), (6.229093216, 1.662568124), (6.210711059, 1.615600245), (6.198388998, 1.567087579), (6.197157628, 1.533837656), (6.196540619, 1.517176936)],
                knots=[0, 0, 0, 0, 0.864439711, 1.673014741, 2.446909759, 3.19383146, 3.919980361, 4.648644137, 5.385779273, 6.135663785, 7.641703236, 9.092511638, 10.543128981, 12, 12, 12, 12], degree=3))
        make_face(mode=Mode.SUBTRACT)
    extrude(amount=-CUT_EXTRUDE5_DEPTH, mode=Mode.SUBTRACT)


solid = part.part
